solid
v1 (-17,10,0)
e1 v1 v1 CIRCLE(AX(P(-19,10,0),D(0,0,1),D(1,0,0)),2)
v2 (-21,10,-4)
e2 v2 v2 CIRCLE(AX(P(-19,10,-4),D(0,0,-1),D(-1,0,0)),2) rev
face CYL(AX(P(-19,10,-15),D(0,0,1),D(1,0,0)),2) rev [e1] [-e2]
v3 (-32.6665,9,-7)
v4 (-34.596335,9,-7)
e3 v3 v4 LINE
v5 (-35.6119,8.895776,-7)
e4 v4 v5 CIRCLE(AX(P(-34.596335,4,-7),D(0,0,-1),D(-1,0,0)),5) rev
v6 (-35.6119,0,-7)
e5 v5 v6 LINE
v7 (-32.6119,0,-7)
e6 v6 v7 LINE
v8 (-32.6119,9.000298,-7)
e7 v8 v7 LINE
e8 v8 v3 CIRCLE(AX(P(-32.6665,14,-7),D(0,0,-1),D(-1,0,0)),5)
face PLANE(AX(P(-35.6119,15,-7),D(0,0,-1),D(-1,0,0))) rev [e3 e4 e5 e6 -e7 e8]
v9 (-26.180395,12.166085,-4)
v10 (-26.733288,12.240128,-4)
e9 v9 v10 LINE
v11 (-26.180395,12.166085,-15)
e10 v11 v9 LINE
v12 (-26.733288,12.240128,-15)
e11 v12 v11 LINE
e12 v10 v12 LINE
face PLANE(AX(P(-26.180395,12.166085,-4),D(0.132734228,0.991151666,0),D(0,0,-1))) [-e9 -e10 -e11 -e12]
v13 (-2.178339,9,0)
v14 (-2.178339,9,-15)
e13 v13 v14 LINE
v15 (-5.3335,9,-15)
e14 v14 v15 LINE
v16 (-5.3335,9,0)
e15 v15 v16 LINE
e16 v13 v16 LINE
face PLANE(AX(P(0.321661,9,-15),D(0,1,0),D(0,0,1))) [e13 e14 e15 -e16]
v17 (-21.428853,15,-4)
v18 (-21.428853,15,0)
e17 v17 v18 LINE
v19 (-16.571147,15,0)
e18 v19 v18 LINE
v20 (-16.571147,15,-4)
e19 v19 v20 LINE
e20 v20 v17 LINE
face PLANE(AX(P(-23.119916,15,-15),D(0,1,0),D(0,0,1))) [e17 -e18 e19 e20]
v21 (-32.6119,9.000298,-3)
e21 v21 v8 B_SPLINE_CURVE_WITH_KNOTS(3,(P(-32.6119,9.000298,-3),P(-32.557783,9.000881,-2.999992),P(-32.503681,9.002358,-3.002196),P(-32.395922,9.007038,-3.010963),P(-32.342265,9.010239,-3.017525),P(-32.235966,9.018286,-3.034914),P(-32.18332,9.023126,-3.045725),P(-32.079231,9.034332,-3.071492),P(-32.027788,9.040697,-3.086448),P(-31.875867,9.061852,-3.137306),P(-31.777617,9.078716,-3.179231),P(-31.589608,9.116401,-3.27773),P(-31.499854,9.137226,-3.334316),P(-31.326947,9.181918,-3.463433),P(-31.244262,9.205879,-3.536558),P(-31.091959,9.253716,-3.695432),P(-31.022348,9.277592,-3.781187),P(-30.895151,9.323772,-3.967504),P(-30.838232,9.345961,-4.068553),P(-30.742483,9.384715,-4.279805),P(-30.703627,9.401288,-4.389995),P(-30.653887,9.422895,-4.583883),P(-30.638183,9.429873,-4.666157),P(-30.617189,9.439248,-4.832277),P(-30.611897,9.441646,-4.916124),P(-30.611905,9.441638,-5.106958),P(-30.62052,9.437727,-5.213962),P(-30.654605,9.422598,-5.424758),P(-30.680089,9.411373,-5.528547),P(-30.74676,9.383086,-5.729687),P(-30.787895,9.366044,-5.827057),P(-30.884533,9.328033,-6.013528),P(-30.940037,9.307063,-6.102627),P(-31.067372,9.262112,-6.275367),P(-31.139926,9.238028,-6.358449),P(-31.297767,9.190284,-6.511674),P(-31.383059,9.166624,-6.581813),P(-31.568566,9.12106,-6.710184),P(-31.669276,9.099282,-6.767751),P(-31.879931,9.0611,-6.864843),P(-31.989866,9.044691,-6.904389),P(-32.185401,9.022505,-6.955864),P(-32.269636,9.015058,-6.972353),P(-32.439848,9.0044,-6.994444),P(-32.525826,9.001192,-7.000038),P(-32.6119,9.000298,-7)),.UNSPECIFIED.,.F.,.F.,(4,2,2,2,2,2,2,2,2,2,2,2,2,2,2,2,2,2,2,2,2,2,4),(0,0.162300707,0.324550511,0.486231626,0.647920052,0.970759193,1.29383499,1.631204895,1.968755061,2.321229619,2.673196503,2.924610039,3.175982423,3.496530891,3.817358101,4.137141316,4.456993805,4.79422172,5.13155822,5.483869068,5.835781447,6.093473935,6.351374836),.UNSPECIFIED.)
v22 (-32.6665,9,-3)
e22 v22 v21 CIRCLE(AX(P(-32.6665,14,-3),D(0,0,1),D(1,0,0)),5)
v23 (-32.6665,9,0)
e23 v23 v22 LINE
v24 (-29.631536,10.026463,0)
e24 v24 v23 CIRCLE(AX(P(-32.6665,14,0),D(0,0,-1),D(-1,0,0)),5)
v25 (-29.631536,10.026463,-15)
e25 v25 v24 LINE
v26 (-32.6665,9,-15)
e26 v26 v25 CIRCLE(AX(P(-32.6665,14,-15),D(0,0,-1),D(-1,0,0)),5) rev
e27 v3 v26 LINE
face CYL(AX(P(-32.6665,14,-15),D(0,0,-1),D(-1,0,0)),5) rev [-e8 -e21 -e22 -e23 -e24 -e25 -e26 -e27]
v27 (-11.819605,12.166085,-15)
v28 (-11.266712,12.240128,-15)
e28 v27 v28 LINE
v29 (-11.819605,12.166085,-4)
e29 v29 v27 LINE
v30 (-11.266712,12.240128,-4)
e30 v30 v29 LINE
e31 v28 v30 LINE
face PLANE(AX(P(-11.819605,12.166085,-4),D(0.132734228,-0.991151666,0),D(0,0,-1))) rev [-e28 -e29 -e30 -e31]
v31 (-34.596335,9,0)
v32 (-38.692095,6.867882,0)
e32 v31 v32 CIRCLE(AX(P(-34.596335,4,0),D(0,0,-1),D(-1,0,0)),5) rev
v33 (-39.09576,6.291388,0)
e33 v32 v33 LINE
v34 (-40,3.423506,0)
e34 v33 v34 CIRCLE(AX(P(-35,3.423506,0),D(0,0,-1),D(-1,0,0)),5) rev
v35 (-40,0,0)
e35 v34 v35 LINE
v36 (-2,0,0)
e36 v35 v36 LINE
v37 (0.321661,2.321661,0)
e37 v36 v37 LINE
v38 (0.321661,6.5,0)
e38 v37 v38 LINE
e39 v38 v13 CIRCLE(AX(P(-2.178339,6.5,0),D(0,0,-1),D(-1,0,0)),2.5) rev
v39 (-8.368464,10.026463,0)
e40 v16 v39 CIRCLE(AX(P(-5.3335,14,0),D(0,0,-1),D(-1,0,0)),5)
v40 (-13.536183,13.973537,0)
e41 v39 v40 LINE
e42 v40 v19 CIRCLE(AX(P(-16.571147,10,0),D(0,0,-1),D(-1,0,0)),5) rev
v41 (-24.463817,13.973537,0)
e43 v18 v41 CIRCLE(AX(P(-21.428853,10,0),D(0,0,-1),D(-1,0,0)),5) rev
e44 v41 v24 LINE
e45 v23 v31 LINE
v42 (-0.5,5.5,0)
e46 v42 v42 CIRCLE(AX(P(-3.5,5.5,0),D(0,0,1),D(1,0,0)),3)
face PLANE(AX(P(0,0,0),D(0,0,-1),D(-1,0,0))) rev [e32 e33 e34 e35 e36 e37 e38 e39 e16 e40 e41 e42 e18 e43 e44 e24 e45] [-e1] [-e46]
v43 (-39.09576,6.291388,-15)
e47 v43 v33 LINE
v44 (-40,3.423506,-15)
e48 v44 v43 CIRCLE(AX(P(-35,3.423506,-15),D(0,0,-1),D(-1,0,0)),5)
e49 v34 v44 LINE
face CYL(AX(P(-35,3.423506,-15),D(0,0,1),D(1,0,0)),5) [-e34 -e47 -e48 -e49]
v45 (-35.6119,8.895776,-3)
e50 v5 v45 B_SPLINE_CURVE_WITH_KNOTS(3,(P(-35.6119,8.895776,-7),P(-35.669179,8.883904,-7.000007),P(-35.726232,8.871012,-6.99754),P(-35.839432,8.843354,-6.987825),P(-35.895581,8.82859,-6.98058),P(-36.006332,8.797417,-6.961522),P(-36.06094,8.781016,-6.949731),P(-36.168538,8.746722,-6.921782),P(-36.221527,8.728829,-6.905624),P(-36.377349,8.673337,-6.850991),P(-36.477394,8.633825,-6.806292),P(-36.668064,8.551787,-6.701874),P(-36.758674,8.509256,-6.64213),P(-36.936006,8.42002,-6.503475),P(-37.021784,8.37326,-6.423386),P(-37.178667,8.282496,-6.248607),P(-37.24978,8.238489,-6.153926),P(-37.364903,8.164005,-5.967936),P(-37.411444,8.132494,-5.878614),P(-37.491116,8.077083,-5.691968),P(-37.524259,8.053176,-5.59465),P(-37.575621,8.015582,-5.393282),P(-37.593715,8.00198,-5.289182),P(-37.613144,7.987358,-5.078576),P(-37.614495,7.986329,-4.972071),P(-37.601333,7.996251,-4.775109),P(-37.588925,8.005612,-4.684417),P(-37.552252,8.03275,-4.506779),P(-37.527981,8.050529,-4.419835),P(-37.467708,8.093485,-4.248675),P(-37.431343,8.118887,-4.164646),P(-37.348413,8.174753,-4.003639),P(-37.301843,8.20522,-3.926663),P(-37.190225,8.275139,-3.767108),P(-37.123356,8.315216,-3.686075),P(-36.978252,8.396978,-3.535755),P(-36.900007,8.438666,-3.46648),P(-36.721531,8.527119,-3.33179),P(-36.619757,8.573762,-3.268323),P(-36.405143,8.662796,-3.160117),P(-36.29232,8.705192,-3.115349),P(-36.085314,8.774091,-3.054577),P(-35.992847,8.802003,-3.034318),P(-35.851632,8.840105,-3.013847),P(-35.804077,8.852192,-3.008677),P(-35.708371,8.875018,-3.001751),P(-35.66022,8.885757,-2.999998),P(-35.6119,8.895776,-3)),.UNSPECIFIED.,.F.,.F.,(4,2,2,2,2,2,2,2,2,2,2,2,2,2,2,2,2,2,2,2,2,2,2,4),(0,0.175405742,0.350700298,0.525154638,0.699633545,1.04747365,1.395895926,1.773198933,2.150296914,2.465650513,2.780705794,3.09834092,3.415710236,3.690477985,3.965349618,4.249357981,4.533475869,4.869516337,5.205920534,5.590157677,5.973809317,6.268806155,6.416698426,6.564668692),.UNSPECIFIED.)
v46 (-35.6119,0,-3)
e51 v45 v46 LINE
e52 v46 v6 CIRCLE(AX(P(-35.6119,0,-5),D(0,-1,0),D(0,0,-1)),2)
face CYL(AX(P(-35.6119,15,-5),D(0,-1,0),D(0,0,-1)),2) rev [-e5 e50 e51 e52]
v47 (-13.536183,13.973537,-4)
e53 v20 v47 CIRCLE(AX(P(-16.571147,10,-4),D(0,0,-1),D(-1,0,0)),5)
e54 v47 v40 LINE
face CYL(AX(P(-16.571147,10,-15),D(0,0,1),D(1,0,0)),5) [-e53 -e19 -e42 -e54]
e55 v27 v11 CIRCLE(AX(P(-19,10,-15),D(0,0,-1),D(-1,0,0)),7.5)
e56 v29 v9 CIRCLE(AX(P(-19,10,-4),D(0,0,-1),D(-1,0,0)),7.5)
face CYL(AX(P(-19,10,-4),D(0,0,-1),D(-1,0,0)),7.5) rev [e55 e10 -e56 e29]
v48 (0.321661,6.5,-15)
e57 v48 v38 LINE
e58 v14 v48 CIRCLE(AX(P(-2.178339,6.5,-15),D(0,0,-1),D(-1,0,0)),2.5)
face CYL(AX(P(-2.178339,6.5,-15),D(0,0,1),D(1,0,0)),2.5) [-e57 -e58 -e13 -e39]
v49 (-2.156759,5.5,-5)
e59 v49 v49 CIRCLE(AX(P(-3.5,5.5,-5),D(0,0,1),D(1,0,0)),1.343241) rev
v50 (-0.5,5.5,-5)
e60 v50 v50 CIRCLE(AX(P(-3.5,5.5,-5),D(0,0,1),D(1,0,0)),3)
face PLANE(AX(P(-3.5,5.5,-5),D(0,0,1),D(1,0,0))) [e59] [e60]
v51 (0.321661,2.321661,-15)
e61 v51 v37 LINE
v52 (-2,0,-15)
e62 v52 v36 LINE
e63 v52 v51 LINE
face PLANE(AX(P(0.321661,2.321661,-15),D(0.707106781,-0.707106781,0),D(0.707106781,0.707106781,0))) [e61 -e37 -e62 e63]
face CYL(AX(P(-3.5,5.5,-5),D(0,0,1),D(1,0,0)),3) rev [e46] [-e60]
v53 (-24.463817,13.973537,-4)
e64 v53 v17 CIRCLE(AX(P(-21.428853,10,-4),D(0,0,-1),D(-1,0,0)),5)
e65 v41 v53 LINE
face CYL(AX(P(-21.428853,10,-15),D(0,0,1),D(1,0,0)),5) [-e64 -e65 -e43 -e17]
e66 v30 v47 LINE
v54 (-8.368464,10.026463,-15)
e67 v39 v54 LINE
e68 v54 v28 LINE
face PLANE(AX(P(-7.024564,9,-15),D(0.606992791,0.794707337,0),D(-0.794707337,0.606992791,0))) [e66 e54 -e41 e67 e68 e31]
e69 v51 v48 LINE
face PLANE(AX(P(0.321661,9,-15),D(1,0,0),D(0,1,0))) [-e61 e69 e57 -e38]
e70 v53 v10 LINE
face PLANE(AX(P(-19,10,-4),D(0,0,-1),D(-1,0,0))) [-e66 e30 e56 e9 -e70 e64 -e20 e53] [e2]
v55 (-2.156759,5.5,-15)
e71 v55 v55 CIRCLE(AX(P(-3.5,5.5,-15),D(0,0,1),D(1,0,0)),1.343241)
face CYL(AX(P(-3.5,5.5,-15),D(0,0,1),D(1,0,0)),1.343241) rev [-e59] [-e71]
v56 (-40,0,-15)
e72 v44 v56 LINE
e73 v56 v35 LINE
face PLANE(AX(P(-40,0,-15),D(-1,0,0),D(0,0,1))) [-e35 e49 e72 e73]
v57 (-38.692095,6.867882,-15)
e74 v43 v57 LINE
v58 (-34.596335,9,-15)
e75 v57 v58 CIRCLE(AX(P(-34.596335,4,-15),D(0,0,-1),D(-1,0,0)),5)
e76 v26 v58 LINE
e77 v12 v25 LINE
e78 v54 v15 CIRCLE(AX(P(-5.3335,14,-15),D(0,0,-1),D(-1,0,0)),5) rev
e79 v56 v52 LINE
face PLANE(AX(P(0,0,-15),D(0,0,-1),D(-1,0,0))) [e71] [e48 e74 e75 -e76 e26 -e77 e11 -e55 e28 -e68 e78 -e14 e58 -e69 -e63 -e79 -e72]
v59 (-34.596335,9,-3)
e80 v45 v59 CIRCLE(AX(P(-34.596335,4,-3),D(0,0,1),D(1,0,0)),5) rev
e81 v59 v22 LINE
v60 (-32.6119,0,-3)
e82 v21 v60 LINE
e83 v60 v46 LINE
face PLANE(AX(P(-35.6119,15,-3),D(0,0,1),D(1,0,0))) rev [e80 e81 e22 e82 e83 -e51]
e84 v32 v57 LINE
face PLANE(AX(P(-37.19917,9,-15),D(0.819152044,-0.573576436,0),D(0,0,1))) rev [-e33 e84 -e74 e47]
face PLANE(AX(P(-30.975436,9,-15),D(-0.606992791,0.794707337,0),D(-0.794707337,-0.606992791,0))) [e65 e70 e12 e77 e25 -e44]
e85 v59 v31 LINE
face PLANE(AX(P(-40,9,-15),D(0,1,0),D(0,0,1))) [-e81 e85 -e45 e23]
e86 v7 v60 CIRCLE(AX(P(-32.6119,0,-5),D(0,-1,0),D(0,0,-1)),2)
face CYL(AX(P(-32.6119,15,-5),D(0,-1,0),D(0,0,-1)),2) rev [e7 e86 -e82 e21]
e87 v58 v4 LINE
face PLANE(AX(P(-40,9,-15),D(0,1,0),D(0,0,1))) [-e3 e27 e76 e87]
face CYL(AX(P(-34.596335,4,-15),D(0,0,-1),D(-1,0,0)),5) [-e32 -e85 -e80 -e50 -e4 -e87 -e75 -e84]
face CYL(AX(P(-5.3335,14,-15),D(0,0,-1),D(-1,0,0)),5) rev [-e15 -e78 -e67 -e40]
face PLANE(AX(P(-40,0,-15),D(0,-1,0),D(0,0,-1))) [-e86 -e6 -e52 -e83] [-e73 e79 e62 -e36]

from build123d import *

# Parameters (mm, degrees)
SCHIZZO2_R                   = 2
SCHIZZO2_R_2                 = 1.343240654
ESTRUSIONE_ESTRUSIONE1_DEPTH = 15
SCHIZZO3_R                   = 7.5
TAGLIO_ESTRUSIONE1_DEPTH     = 11
SMUSSO3_SIZE                 = 1
RACCORDO1_R                  = 2.5
SMUSSO4_SIZE                 = 4
SMUSSO4_SIZE2                = 2.800830153
TAGLIO_ESTRUSIONE3_DEPTH     = 46.276925691
FILLET1_R                    = 5
FILLET3_R                    = 5
FILLET4_R                    = 5
FILLET5_R                    = 5
SKETCH1_R                    = 3
CUT_EXTRUDE1_DEPTH           = 5


with BuildPart() as part:
    # Schizzo2 → Estrusione-Estrusione1 (new body)
    with BuildSketch(Plane.XY):
        Polygon((-40, 0), (-2, 0), (0.321661039, 2.321661039), (0.321661039, 9), (-7.024563842, 9), (-14.880083854, 15), (-23.119916146, 15), (-30.975436158, 9), (-40, 9), align=None)
        with Locations((-19, 10)):
            Circle(SCHIZZO2_R, mode=Mode.SUBTRACT)
        with Locations((-3.5, 5.5)):
            Circle(SCHIZZO2_R_2, mode=Mode.SUBTRACT)
    extrude(amount=-ESTRUSIONE_ESTRUSIONE1_DEPTH)

    # Schizzo3 → Taglio-Estrusione1 (cut)
    with BuildSketch(Plane(origin=(0, 0, -15), x_dir=(-1, 0, 0), z_dir=(0, 0, -1))):
        with Locations((19, 10)):
            Circle(SCHIZZO3_R)
    extrude(amount=-TAGLIO_ESTRUSIONE1_DEPTH, mode=Mode.SUBTRACT)

    # Smusso3
    # the kernel refuses this chamfer: 1, 0.730975935 mm, written as the material it takes off along each edge
    with BuildSketch(Plane(origin=(-25.938580935, 12.847120406, -4), x_dir=(-0.7947073367402627, -0.6069927914985472, 0), z_dir=(0, 0, -1))) as smusso3_piece_1:
        with BuildLine():
            Line((SMUSSO3_SIZE, 0), (0.605555486, -0.394444514))
            ThreePointArc((0.605555486, -0.394444514), (0.30405624, -0.187661825), (0, 0))
            Line((0, 0), (SMUSSO3_SIZE, 0))
        make_face()
    extrude(amount=13.571682988, mode=Mode.SUBTRACT)
    with BuildSketch(Plane(origin=(-12.061419065, 12.847120406, -4), x_dir=(0.33460224521765425, -0.94235945238285, 0), z_dir=(0, 0, -1))) as smusso3_piece_2:
        with BuildLine():
            Line((0.722692134, 0), (SMUSSO3_SIZE * 0.837916253761, -SMUSSO3_SIZE * 0.545798819789))
            Line((SMUSSO3_SIZE * 0.837916253761, -SMUSSO3_SIZE * 0.545798819789), (0, 0))
            ThreePointArc((0, 0), (0.357199268, -0.008708643), (0.722692134, 0))
        make_face()
    extrude(amount=13.571682988, mode=Mode.SUBTRACT)

    # Raccordo1
    raccordo1_edges = [part.edges().sort_by_distance(p)[0] for p in [
        (0.321661039, 9, -7.5),
    ]]
    fillet(raccordo1_edges, radius=RACCORDO1_R)

    # Smusso4
    smusso4_edges = [part.edges().sort_by_distance(p)[0] for p in [
        (-40, 9, -7.5),
    ]]
    smusso4_side = [part.faces().sort_by_distance(p)[0] for p in [
        (-40, 4.5, -7.5),
    ]]
    chamfer(smusso4_edges, length=SMUSSO4_SIZE, length2=SMUSSO4_SIZE2, reference=smusso4_side[0])

    # Schizzo5 → Taglio-Estrusione3 (cut, through all)
    with BuildSketch(Plane.XZ):
        with BuildLine():
            Line((-35.611900304, -3), (-32.611900304, -3))
            ThreePointArc((-32.611900304, -3), (-30.611900304, -5), (-32.611900304, -7))
            Line((-32.611900304, -7), (-35.611900304, -7))
            ThreePointArc((-35.611900304, -7), (-37.611900304, -5), (-35.611900304, -3))
        make_face()
    extrude(amount=-TAGLIO_ESTRUSIONE3_DEPTH, mode=Mode.SUBTRACT)

    # Fillet1
    fillet1_edges = [part.edges().sort_by_distance(p)[0] for p in [
        (-7.024563842, 9, -7.5),
    ]]
    fillet(fillet1_edges, radius=FILLET1_R)

    # Fillet3
    # the kernel refuses this fillet: 5 mm, written as the material it takes off along each edge
    with BuildSketch(Plane(origin=(-37.199169847, 9, 0.290299162), x_dir=(-0.573576436351049, -0.8191520442889898, 0), z_dir=(0, 0, -1))) as fillet3_piece_1:
        with BuildLine():
            CenterArc((FILLET3_R * 0.520567050552, -FILLET3_R), FILLET3_R, 90, 55)
            Line((-FILLET3_R * 0.298584993737, -FILLET3_R * 0.426423563649), (0, 0))
            Line((0, 0), (FILLET3_R * 0.520567050552, 0))
        make_face()
    extrude(amount=21.797387294, mode=Mode.SUBTRACT)
    with BuildSketch(Plane(origin=(-40, 5, 3.941234861), x_dir=(0, -1, 0), z_dir=(0, 0, -1))) as fillet3_piece_2:
        with BuildLine():
            CenterArc((FILLET3_R * 0.315298788879, -FILLET3_R), FILLET3_R, 90, 35)
            Line((-FILLET3_R * 0.258277647472, -FILLET3_R * 0.180847955711), (0, 0))
            Line((0, 0), (FILLET3_R * 0.315298788879, 0))
        make_face()
    extrude(amount=22.882469722, mode=Mode.SUBTRACT)
    with BuildSketch(Plane(origin=(-37.199169847, 9, 6.507088132), x_dir=(-0.573576436351049, -0.8191520442889898, 0), z_dir=(0, 0, -1))) as fillet3_piece_3:
        with BuildLine():
            CenterArc((FILLET3_R * 0.520567050552, -FILLET3_R), FILLET3_R, 90, 55)
            Line((-FILLET3_R * 0.298584993737, -FILLET3_R * 0.426423563649), (0, 0))
            Line((0, 0), (FILLET3_R * 0.520567050552, 0))
        make_face()
    extrude(amount=16.797387294, mode=Mode.SUBTRACT)

    # Fillet4
    fillet4_edges = [part.edges().sort_by_distance(p)[0] for p in [
        (-14.880083854, 15, -2),
        (-23.119916146, 15, -2),
    ]]
    fillet(fillet4_edges, radius=FILLET4_R)

    # Fillet5
    # the kernel refuses this fillet: 5 mm, written as the material it adds along each edge
    with BuildSketch(Plane(origin=(-30.975436158, 9, -1.922117515), x_dir=(0.794707336740263, 0.6069927914985467, 0), z_dir=(0, 0, -1))) as fillet5_piece_1_section:
        with BuildLine():
            CenterArc((FILLET5_R * 0.338212687424, -FILLET5_R), FILLET5_R, 90, 37.372378399)
            Line((-FILLET5_R * 0.268780104075, -FILLET5_R * 0.20529266326), (0, 0))
            Line((0, 0), (FILLET5_R * 0.338212687424, 0))
        make_face()
    fillet5_piece_1 = extrude(amount=13.077882485, mode=Mode.PRIVATE)
    fillet5_piece_1 = fillet5_piece_1 - Plane(origin=(-32.611900304, 9, -5), x_dir=(0, 0, 1), z_dir=(0, -1, 0)) * Cylinder(2, 33, mode=Mode.PRIVATE)
    add(fillet5_piece_1)
    with BuildSketch(Plane(origin=(-30.975436158, 9, 0), x_dir=(0.794707336740263, 0.6069927914985467, 0), z_dir=(0, 0, -1))) as fillet5_piece_2_section:
        with BuildLine():
            CenterArc((FILLET5_R * 0.338212687424, -FILLET5_R), FILLET5_R, 90, 37.372378399)
            Line((-FILLET5_R * 0.268780104075, -FILLET5_R * 0.20529266326), (0, 0))
            Line((0, 0), (FILLET5_R * 0.338212687424, 0))
        make_face()
    fillet5_piece_2 = extrude(amount=8.077882485, mode=Mode.PRIVATE)
    fillet5_piece_2 = fillet5_piece_2 - Plane(origin=(-32.611900304, 9, -5), x_dir=(0, 0, 1), z_dir=(0, -1, 0)) * Cylinder(2, 23, mode=Mode.PRIVATE)
    add(fillet5_piece_2)

    # Sketch1 → Cut-Extrude1 (cut)
    with BuildSketch(Plane.XY):
        with Locations((-3.5, 5.5)):
            Circle(SKETCH1_R)
    extrude(amount=-CUT_EXTRUDE1_DEPTH, mode=Mode.SUBTRACT)


solid = part.part
